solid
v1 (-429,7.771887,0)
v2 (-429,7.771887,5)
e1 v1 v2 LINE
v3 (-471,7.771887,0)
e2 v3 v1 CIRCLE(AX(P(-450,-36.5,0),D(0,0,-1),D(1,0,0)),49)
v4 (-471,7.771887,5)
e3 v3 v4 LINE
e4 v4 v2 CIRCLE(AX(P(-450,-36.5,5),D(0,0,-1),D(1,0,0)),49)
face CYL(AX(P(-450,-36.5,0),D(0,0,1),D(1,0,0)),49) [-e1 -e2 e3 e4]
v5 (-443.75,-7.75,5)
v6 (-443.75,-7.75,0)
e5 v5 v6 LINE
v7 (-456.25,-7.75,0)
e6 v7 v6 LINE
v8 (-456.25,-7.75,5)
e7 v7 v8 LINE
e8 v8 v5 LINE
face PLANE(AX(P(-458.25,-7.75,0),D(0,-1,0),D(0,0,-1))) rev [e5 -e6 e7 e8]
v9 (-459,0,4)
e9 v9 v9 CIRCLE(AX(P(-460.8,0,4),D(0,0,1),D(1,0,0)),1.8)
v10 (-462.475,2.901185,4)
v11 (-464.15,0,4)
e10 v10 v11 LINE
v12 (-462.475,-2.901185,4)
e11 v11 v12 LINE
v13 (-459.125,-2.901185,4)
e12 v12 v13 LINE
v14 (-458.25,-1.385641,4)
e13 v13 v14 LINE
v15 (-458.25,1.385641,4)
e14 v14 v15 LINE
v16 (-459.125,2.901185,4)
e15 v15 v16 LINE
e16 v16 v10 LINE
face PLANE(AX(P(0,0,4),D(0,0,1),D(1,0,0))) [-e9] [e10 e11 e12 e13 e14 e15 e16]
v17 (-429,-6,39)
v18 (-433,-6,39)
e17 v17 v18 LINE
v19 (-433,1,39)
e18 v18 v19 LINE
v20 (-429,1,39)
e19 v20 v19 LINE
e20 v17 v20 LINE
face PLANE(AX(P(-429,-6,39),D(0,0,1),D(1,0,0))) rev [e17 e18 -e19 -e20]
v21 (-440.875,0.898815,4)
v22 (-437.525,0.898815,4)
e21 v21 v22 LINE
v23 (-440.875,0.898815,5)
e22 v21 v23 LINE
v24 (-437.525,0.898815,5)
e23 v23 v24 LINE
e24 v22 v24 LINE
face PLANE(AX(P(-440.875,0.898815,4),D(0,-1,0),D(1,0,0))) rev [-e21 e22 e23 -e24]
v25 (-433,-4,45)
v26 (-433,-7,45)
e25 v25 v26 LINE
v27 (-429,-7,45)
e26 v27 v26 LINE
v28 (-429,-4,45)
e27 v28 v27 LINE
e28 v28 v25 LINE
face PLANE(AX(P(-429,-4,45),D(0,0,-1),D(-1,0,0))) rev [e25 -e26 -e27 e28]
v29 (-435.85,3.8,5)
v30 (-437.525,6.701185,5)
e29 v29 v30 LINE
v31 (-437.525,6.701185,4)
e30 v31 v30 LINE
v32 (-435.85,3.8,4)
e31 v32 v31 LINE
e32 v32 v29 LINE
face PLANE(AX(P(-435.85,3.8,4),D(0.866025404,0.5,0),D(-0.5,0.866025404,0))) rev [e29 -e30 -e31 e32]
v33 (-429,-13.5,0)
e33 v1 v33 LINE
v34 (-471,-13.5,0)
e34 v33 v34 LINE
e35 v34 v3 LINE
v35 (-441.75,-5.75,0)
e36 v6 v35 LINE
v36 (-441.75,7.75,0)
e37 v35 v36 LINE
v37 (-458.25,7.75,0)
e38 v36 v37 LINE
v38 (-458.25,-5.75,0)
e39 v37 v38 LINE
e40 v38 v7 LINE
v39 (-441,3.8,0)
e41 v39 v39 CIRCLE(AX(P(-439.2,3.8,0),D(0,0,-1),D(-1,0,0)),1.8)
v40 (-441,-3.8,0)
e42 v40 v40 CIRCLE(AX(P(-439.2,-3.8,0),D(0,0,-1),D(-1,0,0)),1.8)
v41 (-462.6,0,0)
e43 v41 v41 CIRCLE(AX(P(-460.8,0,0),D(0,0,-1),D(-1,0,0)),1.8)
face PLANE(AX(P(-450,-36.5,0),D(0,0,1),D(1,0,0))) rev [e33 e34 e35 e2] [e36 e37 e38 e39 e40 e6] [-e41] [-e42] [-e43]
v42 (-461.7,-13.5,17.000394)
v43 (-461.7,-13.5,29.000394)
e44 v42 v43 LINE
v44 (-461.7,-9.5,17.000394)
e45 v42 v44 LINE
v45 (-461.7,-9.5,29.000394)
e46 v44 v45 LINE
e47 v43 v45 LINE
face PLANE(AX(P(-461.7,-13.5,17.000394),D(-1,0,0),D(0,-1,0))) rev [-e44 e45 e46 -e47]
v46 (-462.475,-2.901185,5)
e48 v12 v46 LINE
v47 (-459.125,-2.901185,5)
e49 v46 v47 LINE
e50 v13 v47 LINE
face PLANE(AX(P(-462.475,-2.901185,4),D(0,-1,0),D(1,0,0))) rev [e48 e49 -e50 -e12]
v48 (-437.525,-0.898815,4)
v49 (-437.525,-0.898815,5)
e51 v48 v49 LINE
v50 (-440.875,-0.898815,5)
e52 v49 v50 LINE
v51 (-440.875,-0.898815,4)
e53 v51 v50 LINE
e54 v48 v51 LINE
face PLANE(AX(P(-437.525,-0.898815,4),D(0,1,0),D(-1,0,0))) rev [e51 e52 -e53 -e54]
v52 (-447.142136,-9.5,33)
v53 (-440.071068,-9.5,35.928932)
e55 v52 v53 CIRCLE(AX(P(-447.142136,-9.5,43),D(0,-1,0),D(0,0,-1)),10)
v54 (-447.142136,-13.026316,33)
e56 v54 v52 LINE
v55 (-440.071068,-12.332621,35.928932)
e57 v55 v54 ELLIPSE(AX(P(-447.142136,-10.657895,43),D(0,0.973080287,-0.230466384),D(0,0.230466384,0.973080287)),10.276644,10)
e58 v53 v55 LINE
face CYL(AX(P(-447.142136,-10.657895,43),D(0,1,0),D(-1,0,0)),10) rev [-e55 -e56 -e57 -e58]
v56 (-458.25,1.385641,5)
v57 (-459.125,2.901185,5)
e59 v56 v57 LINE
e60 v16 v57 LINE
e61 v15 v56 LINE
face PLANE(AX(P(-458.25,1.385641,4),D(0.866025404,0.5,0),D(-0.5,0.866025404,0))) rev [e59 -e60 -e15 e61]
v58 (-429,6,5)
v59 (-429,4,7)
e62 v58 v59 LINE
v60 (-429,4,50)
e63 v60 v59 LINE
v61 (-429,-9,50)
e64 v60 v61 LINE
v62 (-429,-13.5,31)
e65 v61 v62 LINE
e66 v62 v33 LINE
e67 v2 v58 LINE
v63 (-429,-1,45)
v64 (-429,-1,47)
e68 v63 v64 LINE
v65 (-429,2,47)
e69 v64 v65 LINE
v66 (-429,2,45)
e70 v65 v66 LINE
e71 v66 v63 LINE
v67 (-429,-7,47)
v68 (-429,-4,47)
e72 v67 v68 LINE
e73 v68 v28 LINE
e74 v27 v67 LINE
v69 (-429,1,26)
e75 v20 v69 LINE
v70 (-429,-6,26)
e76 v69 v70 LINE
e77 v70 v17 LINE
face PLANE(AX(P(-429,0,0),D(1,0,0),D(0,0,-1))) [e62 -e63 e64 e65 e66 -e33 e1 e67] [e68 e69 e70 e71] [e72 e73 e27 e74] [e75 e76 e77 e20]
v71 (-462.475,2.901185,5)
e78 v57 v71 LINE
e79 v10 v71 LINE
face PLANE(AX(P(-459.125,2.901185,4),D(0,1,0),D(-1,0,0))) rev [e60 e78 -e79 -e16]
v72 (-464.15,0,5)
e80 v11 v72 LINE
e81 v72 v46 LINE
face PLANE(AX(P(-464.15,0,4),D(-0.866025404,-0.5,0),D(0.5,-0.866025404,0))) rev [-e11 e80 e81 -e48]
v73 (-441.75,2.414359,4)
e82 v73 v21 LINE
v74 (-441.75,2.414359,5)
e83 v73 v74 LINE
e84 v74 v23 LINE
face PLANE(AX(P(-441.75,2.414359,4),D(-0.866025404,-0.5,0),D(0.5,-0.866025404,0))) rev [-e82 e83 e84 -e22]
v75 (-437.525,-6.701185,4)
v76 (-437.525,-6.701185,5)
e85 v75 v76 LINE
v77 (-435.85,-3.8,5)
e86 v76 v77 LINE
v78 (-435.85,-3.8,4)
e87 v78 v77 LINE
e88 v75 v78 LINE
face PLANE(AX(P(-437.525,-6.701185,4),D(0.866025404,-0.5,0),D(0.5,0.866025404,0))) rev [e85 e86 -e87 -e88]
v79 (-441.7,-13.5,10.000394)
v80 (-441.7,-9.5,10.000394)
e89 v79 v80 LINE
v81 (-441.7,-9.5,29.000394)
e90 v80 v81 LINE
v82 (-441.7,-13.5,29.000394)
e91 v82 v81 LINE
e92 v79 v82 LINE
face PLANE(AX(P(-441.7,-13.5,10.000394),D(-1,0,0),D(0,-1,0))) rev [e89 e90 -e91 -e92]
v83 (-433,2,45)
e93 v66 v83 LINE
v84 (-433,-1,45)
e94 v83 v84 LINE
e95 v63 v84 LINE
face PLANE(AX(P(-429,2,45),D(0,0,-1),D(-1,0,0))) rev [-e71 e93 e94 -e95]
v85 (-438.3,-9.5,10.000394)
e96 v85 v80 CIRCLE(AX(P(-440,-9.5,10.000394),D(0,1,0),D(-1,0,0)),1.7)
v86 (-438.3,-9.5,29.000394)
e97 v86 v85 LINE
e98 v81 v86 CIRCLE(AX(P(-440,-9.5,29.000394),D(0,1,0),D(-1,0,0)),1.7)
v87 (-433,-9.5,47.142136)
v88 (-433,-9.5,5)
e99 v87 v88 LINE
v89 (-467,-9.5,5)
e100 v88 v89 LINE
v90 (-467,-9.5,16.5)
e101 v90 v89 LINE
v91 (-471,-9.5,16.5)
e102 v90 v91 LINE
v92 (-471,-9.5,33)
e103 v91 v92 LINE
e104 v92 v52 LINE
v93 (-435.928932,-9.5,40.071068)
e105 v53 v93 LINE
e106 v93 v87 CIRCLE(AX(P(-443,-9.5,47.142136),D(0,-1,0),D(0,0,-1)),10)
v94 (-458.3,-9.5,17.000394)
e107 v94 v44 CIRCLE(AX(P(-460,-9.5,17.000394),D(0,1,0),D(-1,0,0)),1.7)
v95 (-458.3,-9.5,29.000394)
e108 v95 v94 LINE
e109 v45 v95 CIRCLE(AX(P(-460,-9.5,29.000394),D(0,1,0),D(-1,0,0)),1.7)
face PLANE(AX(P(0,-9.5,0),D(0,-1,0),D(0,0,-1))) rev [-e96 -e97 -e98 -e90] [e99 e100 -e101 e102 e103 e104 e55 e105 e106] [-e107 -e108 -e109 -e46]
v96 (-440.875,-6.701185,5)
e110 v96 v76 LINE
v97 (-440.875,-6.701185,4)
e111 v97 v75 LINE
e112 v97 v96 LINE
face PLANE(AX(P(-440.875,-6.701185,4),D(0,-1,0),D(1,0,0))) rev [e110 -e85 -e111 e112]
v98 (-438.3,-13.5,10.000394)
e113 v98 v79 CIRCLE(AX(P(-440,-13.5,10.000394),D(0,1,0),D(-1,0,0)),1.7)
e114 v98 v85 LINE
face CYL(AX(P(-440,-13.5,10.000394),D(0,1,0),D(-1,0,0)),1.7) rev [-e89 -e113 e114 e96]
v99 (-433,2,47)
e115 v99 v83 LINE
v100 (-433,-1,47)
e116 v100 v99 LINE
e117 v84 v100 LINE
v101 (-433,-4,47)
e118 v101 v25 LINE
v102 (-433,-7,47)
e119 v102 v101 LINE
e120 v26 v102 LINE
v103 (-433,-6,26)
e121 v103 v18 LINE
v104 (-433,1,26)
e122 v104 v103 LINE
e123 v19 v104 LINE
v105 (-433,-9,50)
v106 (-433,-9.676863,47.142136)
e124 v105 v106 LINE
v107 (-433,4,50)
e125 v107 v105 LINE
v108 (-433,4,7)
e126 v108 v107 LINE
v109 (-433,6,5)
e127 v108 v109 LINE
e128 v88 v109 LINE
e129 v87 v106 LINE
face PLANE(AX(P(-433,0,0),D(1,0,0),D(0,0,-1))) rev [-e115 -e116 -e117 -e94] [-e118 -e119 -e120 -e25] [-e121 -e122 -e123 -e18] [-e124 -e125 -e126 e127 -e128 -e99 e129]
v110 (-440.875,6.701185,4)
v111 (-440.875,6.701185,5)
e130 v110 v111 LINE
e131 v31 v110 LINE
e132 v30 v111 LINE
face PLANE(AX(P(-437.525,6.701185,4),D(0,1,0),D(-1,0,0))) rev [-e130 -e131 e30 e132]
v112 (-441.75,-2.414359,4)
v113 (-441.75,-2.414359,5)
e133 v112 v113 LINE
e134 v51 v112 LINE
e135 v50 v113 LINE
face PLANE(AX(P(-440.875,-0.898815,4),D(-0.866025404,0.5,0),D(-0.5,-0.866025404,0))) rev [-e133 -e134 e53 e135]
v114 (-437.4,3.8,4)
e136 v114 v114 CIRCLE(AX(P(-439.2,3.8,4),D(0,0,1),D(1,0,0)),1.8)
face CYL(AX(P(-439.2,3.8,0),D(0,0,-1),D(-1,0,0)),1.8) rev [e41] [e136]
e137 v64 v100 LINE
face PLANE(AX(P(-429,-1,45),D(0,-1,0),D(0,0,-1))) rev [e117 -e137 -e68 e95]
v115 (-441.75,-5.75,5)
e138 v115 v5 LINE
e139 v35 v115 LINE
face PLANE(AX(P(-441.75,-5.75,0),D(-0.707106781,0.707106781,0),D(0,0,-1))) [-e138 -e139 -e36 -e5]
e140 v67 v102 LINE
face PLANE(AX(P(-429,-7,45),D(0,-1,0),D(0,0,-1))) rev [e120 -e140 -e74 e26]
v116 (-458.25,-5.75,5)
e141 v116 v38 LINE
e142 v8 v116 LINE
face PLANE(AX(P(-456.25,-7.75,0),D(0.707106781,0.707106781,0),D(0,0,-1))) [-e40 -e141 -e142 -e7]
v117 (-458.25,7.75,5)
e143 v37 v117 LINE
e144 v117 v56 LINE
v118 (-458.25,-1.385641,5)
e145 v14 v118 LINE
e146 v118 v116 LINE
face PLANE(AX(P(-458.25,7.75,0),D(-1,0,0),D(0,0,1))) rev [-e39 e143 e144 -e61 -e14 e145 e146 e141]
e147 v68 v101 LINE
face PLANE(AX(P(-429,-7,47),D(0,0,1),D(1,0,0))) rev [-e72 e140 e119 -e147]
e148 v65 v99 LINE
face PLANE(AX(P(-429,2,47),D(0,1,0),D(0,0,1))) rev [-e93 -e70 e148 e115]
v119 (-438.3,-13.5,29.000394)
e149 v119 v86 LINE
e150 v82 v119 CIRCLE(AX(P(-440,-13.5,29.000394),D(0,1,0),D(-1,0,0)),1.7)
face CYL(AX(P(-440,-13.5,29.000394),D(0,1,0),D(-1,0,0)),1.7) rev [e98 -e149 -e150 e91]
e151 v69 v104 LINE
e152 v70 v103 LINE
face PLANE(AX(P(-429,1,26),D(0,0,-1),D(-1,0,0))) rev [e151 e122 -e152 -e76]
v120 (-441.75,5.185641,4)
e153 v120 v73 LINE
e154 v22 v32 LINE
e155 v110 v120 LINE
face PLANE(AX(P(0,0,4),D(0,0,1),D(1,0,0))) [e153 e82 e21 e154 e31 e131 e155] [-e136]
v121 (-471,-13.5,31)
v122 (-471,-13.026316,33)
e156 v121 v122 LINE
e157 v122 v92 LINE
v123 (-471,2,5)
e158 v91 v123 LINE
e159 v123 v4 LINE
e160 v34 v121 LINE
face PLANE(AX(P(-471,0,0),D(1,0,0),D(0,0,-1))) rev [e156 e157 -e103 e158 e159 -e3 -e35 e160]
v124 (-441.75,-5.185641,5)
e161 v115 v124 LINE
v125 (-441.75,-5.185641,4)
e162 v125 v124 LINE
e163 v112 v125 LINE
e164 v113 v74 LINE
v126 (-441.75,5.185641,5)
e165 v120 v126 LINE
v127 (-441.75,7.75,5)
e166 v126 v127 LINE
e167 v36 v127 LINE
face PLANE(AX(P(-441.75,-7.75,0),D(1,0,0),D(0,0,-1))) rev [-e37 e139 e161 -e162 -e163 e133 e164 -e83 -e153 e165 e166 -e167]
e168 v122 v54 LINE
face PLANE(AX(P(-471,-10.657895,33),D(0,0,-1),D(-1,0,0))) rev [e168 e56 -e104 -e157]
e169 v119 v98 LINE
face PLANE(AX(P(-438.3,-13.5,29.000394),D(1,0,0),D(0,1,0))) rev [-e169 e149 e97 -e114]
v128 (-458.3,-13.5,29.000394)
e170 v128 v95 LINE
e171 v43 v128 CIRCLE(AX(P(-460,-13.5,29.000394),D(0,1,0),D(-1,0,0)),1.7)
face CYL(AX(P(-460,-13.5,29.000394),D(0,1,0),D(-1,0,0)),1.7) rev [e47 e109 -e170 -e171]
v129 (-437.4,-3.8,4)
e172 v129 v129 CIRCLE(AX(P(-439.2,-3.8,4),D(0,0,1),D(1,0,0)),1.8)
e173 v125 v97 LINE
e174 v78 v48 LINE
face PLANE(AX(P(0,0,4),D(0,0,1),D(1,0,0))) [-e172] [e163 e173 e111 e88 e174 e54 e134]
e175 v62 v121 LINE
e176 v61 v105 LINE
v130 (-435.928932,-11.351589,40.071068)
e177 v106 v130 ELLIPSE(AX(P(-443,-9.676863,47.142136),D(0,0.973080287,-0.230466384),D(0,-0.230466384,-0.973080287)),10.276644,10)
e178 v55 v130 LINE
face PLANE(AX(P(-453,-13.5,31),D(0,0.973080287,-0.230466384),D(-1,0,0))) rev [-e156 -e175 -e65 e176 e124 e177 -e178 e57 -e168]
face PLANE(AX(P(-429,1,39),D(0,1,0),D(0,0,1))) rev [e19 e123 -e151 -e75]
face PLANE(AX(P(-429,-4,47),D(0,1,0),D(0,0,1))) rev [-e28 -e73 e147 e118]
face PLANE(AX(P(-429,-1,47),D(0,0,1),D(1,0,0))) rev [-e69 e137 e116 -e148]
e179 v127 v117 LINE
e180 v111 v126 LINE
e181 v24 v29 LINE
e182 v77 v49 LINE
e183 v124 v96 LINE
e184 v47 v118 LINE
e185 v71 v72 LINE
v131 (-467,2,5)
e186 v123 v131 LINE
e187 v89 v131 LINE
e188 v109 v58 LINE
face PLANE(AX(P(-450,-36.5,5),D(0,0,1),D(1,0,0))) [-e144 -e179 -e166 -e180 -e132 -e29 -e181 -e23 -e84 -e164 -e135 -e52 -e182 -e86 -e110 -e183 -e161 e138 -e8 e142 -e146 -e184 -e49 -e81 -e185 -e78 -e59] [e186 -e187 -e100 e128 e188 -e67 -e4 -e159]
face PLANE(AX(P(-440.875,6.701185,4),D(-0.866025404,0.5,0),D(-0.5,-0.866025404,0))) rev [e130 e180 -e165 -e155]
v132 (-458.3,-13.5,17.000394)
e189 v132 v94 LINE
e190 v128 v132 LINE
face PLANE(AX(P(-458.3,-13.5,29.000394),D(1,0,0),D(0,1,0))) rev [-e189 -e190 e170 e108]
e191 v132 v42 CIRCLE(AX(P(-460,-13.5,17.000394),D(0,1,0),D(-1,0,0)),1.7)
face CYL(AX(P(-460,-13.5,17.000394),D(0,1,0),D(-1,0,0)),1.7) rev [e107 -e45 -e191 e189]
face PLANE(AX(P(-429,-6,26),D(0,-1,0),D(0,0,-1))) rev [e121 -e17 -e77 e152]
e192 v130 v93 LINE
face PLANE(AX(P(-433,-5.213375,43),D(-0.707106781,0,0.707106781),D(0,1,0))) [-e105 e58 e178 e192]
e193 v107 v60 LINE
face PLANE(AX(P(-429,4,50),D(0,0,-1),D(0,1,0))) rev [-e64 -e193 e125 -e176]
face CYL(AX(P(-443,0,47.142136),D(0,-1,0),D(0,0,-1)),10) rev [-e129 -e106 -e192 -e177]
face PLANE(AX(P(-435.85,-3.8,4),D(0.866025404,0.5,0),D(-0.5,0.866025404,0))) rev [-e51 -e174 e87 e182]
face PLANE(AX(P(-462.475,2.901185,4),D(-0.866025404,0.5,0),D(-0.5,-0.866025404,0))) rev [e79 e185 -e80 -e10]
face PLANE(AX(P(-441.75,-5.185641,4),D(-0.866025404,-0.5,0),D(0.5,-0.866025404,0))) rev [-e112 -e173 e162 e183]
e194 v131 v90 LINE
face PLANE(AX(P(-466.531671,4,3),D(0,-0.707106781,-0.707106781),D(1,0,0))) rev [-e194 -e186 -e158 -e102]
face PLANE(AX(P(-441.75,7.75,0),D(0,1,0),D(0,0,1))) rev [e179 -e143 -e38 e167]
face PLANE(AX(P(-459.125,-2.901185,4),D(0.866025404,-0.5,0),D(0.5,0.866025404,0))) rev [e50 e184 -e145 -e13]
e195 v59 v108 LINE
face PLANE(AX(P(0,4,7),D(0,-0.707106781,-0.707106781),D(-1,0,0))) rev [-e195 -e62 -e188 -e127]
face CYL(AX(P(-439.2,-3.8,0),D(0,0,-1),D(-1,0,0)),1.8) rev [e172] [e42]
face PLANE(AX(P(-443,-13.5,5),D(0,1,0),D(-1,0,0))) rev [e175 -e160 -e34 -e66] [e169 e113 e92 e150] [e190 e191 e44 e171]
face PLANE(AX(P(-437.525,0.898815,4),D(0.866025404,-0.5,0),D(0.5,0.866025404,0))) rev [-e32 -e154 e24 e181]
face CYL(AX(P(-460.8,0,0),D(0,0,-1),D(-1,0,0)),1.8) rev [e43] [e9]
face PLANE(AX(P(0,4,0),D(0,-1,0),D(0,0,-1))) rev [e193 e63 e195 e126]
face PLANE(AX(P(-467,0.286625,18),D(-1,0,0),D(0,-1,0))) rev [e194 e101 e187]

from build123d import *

# Parameters (mm, degrees)
EXTRUDE_START               = -443
EXTRUDE_1_DEPTH             = 10
EXTRUDE_START_2             = -345
EXTRUDE_1_2_OUTLINE_W       = 17
EXTRUDE_1_2_OUTLINE_H       = 4.342105263
EXTRUDE_1_2_DEPTH           = 8.417172155
EXTRUDE_2_DEPTH             = 28
EXTRUDE_3_DEPTH             = 1.157894737
EXTRUDE_4_DEPTH             = 4
SKETCH_5_W                  = 4
SKETCH_5_H                  = 45
EXTRUDE_5_DEPTH             = 13
EXTRUDE_6_DEPTH             = 5
THICKEN_START               = -471
THICKEN_1_DEPTH             = 4
SKETCH_7_W                  = 13
SKETCH_7_H                  = 7
CUT_EXTRUDE_1_DEPTH         = 65.235893393
SKETCH_8_W                  = 2
SKETCH_8_H                  = 3
CUT_EXTRUDE_2_DEPTH         = 65.235893393
SKETCH_9_W                  = 2
SKETCH_9_H                  = 3
CUT_EXTRUDE_3_DEPTH         = 65.235893393
CUT_EXTRUDE_4_DEPTH         = 475.157146946
CUT_EXTRUDE_5_DEPTH         = 475.157146946
SKETCH_12_W                 = 16.5
SKETCH_12_H                 = 15.5
CUT_EXTRUDE_6_DEPTH         = 474.337353269
CUT_EXTRUDE_7_DEPTH         = 1
CUT_EXTRUDE_8_DEPTH         = 1
CUT_EXTRUDE_9_DEPTH         = 1
HOLE_WIZARD_3_6_3_6_1_D     = 3.6
HOLE_WIZARD_3_6_3_6_1_DEPTH = 50
CHAMFER_1_SIZE              = 2
FILLET_1_R                  = 10


with BuildPart() as part:
    # 凸台-拉伸1: read off the stored shape, not the designer's step
    # 凸台-拉伸1 outline → 凸台-拉伸1 (new body)
    with BuildSketch(Plane.YZ.offset(EXTRUDE_START)):
        Polygon((-10.657894737, 43), (-13.5, 31), (-13.5, 5), (-10.657894737, 5), align=None)
    extrude(amount=EXTRUDE_1_DEPTH)

    # Extrude 1 2 outline → Extrude 1 2 (cut)
    with BuildSketch(Plane(origin=(0, 0, 0), x_dir=(0.707106781186548, 0, 0.707106781186547), z_dir=(0.707106781186547, 0, -0.707106781186548)).offset(EXTRUDE_START_2)):
        with Locations((-282.5, 12.828947369)):
            Rectangle(EXTRUDE_1_2_OUTLINE_W, EXTRUDE_1_2_OUTLINE_H)
    extrude(amount=EXTRUDE_1_2_DEPTH, mode=Mode.SUBTRACT)

    # 草图2 → 凸台-拉伸2 (add)
    with BuildSketch(Plane.ZY.offset(443)):
        Polygon((5, -10.657894737), (33, -10.657894737), (33, -13.026315789), (31, -13.5), (5, -13.5), align=None)
    extrude(amount=EXTRUDE_2_DEPTH)

    # 草图3 → 凸台-拉伸3 (add)
    with BuildSketch(Plane(origin=(0, -10.657894737, 0), x_dir=(-1, 0, 0), z_dir=(0, 1, 0))):
        Polygon((471, 5), (433, 5), (433, 43), (443, 33), (471, 33), align=None)
    extrude(amount=EXTRUDE_3_DEPTH)

    # 草图4 → 凸台-拉伸4 (add)
    with BuildSketch(Plane(origin=(-433, 0, 0), x_dir=(0, 0, -1), z_dir=(1, 0, 0))):
        Polygon((-50, -9), (-5, -9), (-5, -13.5), (-31, -13.5), align=None)
    extrude(amount=EXTRUDE_4_DEPTH)

    # 草图5 → 凸台-拉伸5 (add)
    with BuildSketch(Plane(origin=(0, -9, 0), x_dir=(-1, 0, 0), z_dir=(0, 1, 0))):
        with Locations((431, 27.5)):
            Rectangle(SKETCH_5_W, SKETCH_5_H)
    extrude(amount=EXTRUDE_5_DEPTH)

    # 草图6 → 凸台-拉伸6 (add)
    with BuildSketch(Plane(origin=(0, 0, 5), x_dir=(-1, 0, 0), z_dir=(0, 0, -1))):
        with BuildLine():
            Line((429, -13.5), (429, 7.771887242))
            ThreePointArc((429, 7.771887242), (450, 12.5), (471, 7.771887242))
            Line((471, 7.771887242), (471, -13.5))
            Line((471, -13.5), (429, -13.5))
        make_face()
    extrude(amount=EXTRUDE_6_DEPTH)

    # 加厚1: read off the stored shape, not the designer's step
    # 加厚1 outline → 加厚1 (add)
    with BuildSketch(Plane.YZ.offset(THICKEN_START)):
        Polygon((2, 5), (-9.5, 16.5), (-9.5, 5), align=None)
    extrude(amount=THICKEN_1_DEPTH)

    # 草图7 → 切除-拉伸1 (cut, through all)
    with BuildSketch(Plane.ZY.offset(433)):
        with Locations((32.5, -2.5)):
            Rectangle(SKETCH_7_W, SKETCH_7_H)
    extrude(amount=-CUT_EXTRUDE_1_DEPTH, mode=Mode.SUBTRACT)

    # 草图8 → 切除-拉伸2 (cut, through all)
    with BuildSketch(Plane.ZY.offset(433)):
        with Locations((46, 0.5)):
            Rectangle(SKETCH_8_W, SKETCH_8_H)
    extrude(amount=-CUT_EXTRUDE_2_DEPTH, mode=Mode.SUBTRACT)

    # 草图9 → 切除-拉伸3 (cut, through all)
    with BuildSketch(Plane.ZY.offset(433)):
        with Locations((46, -5.5)):
            Rectangle(SKETCH_9_W, SKETCH_9_H)
    extrude(amount=-CUT_EXTRUDE_3_DEPTH, mode=Mode.SUBTRACT)

    # 草图10 → 切除-拉伸4 (cut, through all)
    with BuildSketch(Plane(origin=(0, -9.5, 0), x_dir=(-1, 0, 0), z_dir=(0, 1, 0))):
        with BuildLine():
            Line((438.3, 29.000393674), (438.3, 10.000393674))
            ThreePointArc((438.3, 10.000393674), (440, 8.300393674), (441.7, 10.000393674))
            Line((441.7, 10.000393674), (441.7, 29.000393674))
            ThreePointArc((441.7, 29.000393674), (440, 30.700393674), (438.3, 29.000393674))
        make_face()
    extrude(amount=-CUT_EXTRUDE_4_DEPTH, mode=Mode.SUBTRACT)

    # 草图11 → 切除-拉伸5 (cut, through all)
    with BuildSketch(Plane(origin=(0, -9.5, 0), x_dir=(-1, 0, 0), z_dir=(0, 1, 0))):
        with BuildLine():
            Line((458.3, 29.000393674), (458.3, 17.000393674))
            ThreePointArc((458.3, 17.000393674), (460, 15.300393674), (461.7, 17.000393674))
            Line((461.7, 17.000393674), (461.7, 29.000393674))
            ThreePointArc((461.7, 29.000393674), (460, 30.700393674), (458.3, 29.000393674))
        make_face()
    extrude(amount=-CUT_EXTRUDE_5_DEPTH, mode=Mode.SUBTRACT)

    # 草图12 → 切除-拉伸6 (cut, through all)
    with BuildSketch(Plane.XY.offset(5)):
        with Locations((-450, 0)):
            Rectangle(SKETCH_12_W, SKETCH_12_H)
    extrude(amount=-CUT_EXTRUDE_6_DEPTH, mode=Mode.SUBTRACT)

    # 草图13 → 切除-拉伸7 (cut)
    with BuildSketch(Plane.XY.offset(5)):
        Polygon((-458.25, 1.385640646), (-459.125, 2.901185103), (-462.475, 2.901185103), (-464.15, 0), (-462.475, -2.901185103), (-459.125, -2.901185103), (-458.25, -1.385640646), align=None)
    extrude(amount=-CUT_EXTRUDE_7_DEPTH, mode=Mode.SUBTRACT)

    # 草图14 → 切除-拉伸8 (cut)
    with BuildSketch(Plane.XY.offset(5)):
        Polygon((-441.75, 2.414359354), (-440.875, 0.898814897), (-437.525, 0.898814897), (-435.85, 3.8), (-437.525, 6.701185103), (-440.875, 6.701185103), (-441.75, 5.185640646), align=None)
    extrude(amount=-CUT_EXTRUDE_8_DEPTH, mode=Mode.SUBTRACT)

    # 草图15 → 切除-拉伸9 (cut)
    with BuildSketch(Plane.XY.offset(5)):
        Polygon((-441.75, -5.185640646), (-440.875, -6.701185103), (-437.525, -6.701185103), (-435.85, -3.8), (-437.525, -0.898814897), (-440.875, -0.898814897), (-441.75, -2.414359354), align=None)
    extrude(amount=-CUT_EXTRUDE_9_DEPTH, mode=Mode.SUBTRACT)

    # Ø3.6 (3.6) 直径孔1
    with Locations(Plane(origin=(0, 0, 0), x_dir=(-1, 0, 0), z_dir=(0, 0, -1))):
        with Locations((439.2, -3.8), (439.2, 3.8), (460.8, 0)):
            Hole(HOLE_WIZARD_3_6_3_6_1_D / 2, depth=HOLE_WIZARD_3_6_3_6_1_DEPTH)

    # 倒角1
    chamfer_1_edges = [part.edges().sort_by_distance(p)[0] for p in [
        (-431, 4, 5),
        (-441.75, -7.75, 2.5),
        (-458.25, -7.75, 2.5),
    ]]
    chamfer(chamfer_1_edges, length=CHAMFER_1_SIZE)

    # 圆角1
    fillet_1_edges = [part.edges().sort_by_distance(p)[0] for p in [
        (-443, -11.842105263, 33),
        (-433, -10.078947368, 43),
    ]]
    fillet(fillet_1_edges, radius=FILLET_1_R)


solid = part.part
